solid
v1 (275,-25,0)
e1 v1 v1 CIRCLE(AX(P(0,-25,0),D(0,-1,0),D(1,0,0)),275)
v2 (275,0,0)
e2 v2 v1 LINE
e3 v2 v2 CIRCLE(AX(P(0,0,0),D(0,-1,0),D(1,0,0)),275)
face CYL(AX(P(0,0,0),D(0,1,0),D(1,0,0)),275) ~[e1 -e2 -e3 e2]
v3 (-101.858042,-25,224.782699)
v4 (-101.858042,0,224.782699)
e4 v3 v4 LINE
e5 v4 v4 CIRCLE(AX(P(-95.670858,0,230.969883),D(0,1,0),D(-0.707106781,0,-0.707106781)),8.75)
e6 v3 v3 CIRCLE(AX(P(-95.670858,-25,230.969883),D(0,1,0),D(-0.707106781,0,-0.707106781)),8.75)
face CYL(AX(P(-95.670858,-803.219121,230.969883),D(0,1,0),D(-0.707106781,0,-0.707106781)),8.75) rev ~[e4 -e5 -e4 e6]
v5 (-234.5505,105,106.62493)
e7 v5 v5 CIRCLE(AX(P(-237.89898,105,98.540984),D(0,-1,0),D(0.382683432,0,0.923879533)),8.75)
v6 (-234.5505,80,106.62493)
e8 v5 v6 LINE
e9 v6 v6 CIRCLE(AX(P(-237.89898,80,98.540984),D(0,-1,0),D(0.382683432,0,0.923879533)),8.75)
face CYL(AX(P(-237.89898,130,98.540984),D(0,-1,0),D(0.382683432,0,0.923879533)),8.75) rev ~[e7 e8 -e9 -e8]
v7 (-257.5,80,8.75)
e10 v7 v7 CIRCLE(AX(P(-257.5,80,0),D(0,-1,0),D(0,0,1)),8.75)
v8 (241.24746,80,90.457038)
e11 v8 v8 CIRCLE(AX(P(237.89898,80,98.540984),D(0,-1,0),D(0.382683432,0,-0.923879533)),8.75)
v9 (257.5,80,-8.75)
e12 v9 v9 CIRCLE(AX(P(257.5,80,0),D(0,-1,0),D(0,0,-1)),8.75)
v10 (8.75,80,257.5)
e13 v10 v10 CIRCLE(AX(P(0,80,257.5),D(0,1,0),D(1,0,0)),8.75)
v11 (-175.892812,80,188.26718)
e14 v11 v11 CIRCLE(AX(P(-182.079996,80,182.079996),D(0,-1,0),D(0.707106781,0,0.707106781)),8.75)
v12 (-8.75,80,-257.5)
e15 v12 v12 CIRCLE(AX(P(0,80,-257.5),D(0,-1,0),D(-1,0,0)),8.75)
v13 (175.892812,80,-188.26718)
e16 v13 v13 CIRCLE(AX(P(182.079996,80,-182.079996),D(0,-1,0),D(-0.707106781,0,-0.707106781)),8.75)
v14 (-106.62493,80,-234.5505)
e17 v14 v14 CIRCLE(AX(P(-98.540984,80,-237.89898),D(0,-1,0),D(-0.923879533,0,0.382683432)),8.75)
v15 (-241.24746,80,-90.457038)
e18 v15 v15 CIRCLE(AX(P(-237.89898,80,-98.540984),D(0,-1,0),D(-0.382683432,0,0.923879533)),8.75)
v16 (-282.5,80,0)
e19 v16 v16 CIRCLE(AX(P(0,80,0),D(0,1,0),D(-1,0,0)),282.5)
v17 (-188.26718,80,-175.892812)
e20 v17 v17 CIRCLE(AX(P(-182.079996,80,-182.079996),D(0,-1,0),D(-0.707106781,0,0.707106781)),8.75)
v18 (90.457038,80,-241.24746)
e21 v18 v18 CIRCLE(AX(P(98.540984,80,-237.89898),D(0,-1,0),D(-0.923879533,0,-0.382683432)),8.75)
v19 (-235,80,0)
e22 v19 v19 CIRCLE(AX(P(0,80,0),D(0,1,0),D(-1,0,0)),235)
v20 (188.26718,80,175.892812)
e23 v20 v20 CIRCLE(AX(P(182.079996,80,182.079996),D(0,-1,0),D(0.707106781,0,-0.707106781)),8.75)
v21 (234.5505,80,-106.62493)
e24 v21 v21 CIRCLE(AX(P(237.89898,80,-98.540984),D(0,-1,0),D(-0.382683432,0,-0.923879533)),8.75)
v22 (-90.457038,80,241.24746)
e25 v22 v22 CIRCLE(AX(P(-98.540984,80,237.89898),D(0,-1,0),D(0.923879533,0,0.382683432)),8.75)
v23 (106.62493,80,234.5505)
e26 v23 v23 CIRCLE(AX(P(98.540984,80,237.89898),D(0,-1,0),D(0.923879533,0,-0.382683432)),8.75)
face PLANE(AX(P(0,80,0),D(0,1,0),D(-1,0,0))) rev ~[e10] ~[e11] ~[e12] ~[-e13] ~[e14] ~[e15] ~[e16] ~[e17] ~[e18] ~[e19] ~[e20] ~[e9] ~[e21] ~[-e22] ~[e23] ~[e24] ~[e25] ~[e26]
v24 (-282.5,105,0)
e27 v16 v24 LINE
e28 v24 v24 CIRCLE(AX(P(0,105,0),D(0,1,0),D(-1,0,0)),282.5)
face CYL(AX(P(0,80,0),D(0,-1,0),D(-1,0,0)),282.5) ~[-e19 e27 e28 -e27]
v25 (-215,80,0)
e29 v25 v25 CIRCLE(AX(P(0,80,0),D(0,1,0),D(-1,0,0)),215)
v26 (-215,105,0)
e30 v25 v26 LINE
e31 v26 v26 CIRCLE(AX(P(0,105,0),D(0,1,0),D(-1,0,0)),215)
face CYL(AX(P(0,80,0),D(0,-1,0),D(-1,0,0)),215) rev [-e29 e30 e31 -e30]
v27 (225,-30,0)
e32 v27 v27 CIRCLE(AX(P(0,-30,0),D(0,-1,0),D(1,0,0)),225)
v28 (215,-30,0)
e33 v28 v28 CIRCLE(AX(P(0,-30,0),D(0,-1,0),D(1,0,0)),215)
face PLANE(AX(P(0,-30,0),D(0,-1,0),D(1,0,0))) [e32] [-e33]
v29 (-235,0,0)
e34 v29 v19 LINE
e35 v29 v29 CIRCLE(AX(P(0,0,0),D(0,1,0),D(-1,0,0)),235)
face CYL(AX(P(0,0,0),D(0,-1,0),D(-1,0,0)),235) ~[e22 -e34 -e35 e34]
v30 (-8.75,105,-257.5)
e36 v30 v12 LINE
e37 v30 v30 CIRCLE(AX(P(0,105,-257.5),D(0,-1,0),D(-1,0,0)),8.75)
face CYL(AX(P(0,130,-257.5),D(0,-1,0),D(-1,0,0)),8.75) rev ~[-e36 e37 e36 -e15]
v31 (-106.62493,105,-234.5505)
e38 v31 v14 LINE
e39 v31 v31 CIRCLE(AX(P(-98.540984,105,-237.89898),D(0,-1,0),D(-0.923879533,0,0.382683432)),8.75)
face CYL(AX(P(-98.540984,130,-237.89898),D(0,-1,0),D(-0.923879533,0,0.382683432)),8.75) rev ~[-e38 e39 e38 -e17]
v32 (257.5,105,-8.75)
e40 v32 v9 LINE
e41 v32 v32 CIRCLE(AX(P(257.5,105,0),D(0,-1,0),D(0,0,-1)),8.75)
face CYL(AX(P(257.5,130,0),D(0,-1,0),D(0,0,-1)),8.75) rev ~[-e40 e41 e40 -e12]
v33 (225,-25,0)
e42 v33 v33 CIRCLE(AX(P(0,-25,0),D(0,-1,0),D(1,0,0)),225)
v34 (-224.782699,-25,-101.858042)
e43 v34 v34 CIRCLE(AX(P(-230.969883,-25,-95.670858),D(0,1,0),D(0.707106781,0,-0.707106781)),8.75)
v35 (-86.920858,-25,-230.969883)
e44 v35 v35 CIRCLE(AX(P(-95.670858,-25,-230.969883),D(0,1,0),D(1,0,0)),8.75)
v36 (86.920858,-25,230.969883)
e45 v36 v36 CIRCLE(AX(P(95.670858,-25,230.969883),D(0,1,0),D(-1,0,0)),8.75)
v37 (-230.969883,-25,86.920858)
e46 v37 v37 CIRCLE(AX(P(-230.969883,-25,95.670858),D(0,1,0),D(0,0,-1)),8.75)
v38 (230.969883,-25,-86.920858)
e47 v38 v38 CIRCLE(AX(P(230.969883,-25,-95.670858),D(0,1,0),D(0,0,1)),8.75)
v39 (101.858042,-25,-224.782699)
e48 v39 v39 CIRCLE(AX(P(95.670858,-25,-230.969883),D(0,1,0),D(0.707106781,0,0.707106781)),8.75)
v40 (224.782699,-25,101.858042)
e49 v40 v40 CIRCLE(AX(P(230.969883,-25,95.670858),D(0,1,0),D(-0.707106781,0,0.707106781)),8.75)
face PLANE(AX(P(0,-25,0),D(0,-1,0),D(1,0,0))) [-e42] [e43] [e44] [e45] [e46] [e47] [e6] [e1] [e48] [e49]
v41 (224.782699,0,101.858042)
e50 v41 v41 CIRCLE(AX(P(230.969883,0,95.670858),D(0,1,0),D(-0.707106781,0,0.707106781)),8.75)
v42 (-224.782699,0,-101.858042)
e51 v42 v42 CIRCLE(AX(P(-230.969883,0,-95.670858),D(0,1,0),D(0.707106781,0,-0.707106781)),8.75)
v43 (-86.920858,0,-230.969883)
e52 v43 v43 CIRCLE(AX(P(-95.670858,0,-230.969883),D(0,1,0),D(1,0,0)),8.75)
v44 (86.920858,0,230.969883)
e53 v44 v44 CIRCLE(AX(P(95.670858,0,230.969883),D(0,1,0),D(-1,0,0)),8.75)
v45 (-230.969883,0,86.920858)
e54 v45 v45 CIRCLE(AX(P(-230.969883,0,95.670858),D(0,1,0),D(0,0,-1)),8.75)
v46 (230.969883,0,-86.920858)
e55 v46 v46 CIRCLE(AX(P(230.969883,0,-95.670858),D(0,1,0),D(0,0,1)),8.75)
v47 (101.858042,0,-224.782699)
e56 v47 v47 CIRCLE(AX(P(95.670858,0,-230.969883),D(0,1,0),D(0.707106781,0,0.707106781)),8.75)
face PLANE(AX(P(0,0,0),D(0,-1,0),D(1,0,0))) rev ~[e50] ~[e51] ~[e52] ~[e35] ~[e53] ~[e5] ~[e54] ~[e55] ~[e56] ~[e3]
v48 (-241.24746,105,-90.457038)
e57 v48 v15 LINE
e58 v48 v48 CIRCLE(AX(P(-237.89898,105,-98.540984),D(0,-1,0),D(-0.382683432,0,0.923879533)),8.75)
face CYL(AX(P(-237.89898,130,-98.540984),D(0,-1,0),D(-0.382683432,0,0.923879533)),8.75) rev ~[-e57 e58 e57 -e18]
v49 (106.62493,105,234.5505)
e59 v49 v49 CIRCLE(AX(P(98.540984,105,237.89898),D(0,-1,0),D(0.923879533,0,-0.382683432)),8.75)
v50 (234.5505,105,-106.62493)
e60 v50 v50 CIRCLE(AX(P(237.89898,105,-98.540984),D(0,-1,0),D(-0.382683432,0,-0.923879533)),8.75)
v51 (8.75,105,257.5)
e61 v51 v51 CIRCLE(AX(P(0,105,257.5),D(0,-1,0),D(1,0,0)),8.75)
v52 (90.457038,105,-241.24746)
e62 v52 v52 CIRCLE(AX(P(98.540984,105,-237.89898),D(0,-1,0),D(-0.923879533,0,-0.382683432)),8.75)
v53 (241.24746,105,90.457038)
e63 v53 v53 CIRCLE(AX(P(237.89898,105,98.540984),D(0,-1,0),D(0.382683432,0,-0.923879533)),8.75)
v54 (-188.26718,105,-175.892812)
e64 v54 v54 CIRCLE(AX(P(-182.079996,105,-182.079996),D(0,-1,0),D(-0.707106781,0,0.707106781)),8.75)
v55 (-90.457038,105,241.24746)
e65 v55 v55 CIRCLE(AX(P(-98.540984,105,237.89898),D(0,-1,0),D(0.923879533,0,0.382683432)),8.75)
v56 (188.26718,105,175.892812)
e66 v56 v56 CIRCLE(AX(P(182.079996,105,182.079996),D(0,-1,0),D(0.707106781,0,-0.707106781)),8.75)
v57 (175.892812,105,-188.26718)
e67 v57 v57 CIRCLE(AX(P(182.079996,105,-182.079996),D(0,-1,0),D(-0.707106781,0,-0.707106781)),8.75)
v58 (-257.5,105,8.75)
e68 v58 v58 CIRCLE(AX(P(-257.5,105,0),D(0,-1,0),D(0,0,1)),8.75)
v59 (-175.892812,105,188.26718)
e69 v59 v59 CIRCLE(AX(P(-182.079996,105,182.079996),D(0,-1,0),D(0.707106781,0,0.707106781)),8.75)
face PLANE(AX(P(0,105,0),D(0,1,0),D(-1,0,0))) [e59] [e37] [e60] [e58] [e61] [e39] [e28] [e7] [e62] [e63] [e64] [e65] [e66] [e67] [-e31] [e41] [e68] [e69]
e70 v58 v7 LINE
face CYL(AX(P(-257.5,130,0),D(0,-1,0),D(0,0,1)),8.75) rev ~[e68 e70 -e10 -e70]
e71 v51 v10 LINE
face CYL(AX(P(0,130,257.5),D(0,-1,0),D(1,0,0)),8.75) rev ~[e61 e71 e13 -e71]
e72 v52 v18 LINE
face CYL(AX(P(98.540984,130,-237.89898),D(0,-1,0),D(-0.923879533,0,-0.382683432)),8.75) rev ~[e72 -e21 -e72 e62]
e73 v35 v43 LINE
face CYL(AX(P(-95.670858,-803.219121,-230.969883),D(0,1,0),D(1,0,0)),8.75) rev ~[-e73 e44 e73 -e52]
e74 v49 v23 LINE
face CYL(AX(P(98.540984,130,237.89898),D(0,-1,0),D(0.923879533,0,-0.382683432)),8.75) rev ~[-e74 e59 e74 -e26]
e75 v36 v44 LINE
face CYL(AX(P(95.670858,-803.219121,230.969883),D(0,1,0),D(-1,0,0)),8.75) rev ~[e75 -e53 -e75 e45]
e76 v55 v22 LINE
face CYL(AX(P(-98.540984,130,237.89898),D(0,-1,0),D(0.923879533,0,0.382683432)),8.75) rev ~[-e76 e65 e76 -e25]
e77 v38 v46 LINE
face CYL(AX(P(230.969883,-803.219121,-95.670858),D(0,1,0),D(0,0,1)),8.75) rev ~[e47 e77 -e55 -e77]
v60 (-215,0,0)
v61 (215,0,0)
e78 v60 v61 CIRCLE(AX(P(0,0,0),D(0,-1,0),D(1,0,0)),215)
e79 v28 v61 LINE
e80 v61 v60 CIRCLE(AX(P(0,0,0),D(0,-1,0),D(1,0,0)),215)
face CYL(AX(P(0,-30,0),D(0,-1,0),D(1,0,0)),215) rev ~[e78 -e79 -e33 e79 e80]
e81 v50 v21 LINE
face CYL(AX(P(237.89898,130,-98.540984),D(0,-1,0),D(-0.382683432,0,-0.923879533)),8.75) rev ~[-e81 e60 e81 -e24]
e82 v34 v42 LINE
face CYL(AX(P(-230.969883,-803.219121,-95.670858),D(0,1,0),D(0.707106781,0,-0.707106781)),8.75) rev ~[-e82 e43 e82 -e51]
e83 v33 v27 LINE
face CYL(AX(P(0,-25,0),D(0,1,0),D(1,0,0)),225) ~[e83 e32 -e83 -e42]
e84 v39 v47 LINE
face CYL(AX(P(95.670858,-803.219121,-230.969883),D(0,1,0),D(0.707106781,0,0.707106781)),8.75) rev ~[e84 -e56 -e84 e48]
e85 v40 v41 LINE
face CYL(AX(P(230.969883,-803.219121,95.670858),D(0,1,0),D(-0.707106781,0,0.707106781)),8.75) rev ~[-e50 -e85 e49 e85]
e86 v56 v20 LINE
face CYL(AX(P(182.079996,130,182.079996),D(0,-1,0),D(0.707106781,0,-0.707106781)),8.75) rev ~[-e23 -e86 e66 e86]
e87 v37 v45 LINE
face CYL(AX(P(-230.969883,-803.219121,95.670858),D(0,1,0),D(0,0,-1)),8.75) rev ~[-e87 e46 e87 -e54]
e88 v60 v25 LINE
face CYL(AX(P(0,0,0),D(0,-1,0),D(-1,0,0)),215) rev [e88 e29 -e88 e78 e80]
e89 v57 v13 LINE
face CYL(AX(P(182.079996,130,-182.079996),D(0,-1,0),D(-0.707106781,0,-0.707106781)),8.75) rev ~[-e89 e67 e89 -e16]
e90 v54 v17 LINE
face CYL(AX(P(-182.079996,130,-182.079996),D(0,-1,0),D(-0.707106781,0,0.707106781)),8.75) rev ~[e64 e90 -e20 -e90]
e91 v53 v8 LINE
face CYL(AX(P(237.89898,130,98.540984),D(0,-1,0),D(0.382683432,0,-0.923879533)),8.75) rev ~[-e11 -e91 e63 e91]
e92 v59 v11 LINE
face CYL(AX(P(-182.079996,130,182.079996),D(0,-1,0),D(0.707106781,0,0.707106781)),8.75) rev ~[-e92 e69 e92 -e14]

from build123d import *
from build123d import SkipClean  # not in build123d's __all__

# Parameters (mm, degrees)
F0_R             = 275
F1_DEPTH         = 25
F3_D             = 17.5
F3_COPIES_COUNT  = 8
F4_R             = 225
F5_DEPTH         = 5
F6_R             = 215
F7_DEPTH         = 30.001
F8_R             = 235
F8_R_2           = 215
F9_DEPTH         = 80
F10_R            = 282.5
F10_R_2          = 235
F10_R_3          = 215
F11_DEPTH        = 25
F13_D            = 17.5
F13_DEPTH        = 25
F13_TIP          = 5.2575304165
F13_COPIES_COUNT = 16


# Not quite as in the source:
# - after a boolean that leaves OpenCascade's solid faulty, fix() repairs it
# - a pattern or mirror of a feature is missing from the dataset's text; its kind, count and spacing are read off the source's solid


with BuildPart() as f1:
    # F0 (on Front) → F1 (new body)
    with BuildSketch(Plane.XZ):
        Circle(F0_R)
    extrude(amount=F1_DEPTH)

    # F3 (through all)
    with Locations(Plane.XZ.offset(25)):
        with Locations((95.6708580913, 230.9698831278)):
            f3 = Hole(F3_D / 2)

    # F3_copies: F3 ×8 about axis
    f3_copies_axis = Axis((0, 0, 0), (0, 1, 0))
    for i in range(1, F3_COPIES_COUNT):
        add(f3.rotate(f3_copies_axis, i * 360 / F3_COPIES_COUNT), clean=False, mode=Mode.SUBTRACT)

    # F4 (on face) → F5 (join)
    with BuildSketch(Plane.XZ.offset(25)):
        Circle(F4_R)
    extrude(amount=F5_DEPTH)

    # F6 (on face) → F7 (cut, through all)
    with BuildSketch(Plane.XZ.offset(30)):
        Circle(F6_R)
    extrude(amount=-F7_DEPTH, mode=Mode.SUBTRACT)

    # F8 (on face) → F9 (join)
    with BuildSketch(Plane(origin=(0, 0, 0), x_dir=(-1, 0, 0), z_dir=(0, 1, 0))):
        Circle(F8_R)
        Circle(F8_R_2, mode=Mode.SUBTRACT)
    with SkipClean():  # cleaning this boolean's faces spoils the solid; the shape is the same uncleaned
        extrude(amount=F9_DEPTH)

    # F10 (on face) → F11 (join)
    with BuildSketch(Plane(origin=(0, 80, 0), x_dir=(-1, 0, 0), z_dir=(0, 1, 0))):
        Circle(F10_R)
        Circle(F10_R_2, mode=Mode.SUBTRACT)
        Circle(F10_R_2)
        Circle(F10_R_3, mode=Mode.SUBTRACT)
    extrude(amount=F11_DEPTH)

    add(f1.part.fix(), mode=Mode.REPLACE)

    # F13
    with Locations(Plane(origin=(0, 105, 0), x_dir=(-1, 0, 0), z_dir=(0, 1, 0))):
        with Locations((0, 257.5)):
            f13 = Hole(F13_D / 2, depth=F13_DEPTH)
            with Locations((0, 0, -(F13_DEPTH + F13_TIP / 2))):  # 118° drill point
                Cone(0, F13_D / 2, F13_TIP, mode=Mode.SUBTRACT)

    # F13_copies: F13 ×16 about axis
    f13_copies_axis = Axis((0, 0, 0), (0, 1, 0))
    for i in range(1, F13_COPIES_COUNT):
        add(f13.rotate(f13_copies_axis, i * 360 / F13_COPIES_COUNT), clean=False, mode=Mode.SUBTRACT)


solid = f1.part
